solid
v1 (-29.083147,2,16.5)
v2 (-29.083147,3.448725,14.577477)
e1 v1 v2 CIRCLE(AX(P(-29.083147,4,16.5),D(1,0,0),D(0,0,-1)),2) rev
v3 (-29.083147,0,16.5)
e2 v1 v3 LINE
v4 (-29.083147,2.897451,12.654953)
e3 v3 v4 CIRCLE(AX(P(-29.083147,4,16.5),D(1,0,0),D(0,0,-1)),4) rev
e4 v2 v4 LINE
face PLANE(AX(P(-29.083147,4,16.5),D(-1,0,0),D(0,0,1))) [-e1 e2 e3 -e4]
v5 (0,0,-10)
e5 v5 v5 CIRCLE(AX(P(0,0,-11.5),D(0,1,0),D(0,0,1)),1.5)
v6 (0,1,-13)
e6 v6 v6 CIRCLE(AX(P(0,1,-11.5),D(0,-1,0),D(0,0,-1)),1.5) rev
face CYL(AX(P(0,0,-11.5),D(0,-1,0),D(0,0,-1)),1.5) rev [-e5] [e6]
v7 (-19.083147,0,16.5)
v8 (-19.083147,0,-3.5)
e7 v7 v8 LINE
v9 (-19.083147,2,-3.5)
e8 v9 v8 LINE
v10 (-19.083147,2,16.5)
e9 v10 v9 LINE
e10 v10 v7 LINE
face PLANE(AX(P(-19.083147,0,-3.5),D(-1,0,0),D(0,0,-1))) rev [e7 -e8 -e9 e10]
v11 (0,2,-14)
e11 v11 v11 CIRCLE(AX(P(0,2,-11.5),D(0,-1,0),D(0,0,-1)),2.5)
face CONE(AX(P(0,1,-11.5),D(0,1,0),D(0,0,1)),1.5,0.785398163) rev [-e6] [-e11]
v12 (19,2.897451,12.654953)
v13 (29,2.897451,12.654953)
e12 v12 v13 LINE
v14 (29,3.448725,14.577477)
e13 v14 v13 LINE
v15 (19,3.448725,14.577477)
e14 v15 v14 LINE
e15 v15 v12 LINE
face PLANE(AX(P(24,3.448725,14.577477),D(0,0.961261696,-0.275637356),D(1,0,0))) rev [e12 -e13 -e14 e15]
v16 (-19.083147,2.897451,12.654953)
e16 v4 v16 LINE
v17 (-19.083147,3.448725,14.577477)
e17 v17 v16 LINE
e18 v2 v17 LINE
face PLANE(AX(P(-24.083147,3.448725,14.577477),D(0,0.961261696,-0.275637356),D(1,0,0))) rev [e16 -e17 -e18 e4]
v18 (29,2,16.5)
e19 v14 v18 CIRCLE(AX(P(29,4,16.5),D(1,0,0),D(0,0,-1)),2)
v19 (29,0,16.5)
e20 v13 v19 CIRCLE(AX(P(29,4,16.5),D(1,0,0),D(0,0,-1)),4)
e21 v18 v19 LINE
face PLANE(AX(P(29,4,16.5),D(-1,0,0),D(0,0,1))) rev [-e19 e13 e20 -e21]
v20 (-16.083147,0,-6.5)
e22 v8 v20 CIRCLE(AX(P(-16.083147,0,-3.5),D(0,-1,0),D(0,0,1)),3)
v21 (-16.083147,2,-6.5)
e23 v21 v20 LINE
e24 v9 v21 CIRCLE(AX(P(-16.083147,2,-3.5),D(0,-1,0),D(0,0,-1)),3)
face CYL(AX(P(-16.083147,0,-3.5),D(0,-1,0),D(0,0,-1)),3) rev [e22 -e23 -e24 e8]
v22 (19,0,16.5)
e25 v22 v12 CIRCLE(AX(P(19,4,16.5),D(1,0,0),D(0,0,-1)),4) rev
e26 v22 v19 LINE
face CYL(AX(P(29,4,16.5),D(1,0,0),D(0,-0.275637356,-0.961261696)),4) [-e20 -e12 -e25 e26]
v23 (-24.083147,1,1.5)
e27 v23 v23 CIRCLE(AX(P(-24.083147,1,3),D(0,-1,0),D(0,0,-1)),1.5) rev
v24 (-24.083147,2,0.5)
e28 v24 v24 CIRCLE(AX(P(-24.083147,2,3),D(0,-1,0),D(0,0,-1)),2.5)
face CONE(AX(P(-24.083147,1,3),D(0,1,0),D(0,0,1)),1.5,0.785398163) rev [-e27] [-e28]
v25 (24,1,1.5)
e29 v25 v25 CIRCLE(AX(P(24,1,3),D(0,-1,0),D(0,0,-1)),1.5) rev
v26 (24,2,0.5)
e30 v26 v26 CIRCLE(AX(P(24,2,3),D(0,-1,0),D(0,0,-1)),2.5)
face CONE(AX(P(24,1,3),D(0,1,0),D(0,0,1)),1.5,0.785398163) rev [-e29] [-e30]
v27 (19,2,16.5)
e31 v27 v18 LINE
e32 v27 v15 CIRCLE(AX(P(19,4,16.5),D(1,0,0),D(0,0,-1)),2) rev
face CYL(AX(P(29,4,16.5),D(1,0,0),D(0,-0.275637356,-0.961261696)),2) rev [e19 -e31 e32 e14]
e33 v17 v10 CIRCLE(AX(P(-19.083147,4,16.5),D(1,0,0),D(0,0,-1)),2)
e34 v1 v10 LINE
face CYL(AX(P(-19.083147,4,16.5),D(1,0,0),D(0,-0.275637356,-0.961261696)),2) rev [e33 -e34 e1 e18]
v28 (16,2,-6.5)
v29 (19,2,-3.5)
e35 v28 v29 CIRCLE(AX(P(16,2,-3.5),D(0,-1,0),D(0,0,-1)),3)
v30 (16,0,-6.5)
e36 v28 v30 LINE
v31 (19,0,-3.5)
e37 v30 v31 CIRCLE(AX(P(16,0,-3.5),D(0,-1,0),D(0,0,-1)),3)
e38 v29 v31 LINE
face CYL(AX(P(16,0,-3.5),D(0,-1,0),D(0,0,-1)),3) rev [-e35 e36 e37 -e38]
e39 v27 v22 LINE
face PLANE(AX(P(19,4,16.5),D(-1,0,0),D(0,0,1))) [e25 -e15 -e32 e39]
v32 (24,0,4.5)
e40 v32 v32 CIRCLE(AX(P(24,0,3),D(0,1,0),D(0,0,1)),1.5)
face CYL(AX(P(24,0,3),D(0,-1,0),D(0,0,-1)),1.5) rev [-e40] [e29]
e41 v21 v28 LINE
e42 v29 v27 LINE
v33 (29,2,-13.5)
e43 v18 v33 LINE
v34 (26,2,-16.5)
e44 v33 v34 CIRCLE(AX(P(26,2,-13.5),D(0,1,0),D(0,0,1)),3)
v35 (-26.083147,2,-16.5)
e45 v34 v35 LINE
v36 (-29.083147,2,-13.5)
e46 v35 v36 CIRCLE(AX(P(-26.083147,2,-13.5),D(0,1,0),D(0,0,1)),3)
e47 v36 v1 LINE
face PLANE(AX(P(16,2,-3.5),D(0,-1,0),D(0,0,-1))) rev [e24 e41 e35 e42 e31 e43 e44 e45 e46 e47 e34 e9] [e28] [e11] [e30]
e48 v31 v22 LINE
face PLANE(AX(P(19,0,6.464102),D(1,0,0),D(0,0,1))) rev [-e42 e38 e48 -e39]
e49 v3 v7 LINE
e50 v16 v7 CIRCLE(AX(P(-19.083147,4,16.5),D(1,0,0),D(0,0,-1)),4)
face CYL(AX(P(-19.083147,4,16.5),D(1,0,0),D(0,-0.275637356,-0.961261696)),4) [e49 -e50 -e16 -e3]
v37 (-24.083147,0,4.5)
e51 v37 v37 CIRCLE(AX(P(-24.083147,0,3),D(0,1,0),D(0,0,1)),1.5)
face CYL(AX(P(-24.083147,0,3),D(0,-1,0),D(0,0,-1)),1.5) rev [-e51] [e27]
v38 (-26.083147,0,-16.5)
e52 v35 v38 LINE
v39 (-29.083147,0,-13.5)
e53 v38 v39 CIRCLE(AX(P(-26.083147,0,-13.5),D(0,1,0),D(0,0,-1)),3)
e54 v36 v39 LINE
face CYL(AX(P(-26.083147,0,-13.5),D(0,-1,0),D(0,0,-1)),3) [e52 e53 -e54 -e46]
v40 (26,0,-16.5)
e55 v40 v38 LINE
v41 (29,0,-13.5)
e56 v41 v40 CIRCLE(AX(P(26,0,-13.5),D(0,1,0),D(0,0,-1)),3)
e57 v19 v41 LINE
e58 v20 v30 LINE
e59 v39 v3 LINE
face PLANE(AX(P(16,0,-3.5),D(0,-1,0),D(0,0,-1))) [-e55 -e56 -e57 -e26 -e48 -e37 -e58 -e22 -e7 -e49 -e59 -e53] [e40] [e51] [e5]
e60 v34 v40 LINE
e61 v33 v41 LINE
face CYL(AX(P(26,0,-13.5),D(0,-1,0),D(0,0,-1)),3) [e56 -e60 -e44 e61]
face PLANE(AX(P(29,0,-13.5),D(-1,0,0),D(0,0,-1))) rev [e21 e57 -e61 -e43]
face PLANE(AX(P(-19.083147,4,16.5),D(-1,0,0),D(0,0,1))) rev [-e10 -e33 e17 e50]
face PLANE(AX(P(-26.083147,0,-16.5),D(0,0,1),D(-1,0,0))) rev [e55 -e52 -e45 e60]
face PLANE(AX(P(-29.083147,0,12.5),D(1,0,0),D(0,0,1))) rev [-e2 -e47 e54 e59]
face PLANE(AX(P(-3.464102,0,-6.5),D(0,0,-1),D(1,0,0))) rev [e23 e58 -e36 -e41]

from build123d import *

# Parameters (mm, degrees)
IZIM1_R                     = 1.5
Y_KSEKLIK_EKSTR_ZYON1_DEPTH = 2
Y_KSEKLIK_EKSTR_ZYON2_START = -10
Y_KSEKLIK_EKSTR_ZYON2_DEPTH = 10
Y_KSEKLIK_EKSTR_ZYON3_START = -10
Y_KSEKLIK_EKSTR_ZYON3_DEPTH = 10
KAT_Y_D_N_T_R2_START        = 12.5
KAT_Y_D_N_T_R2_OUTLINE_W    = 10
KAT_Y_D_N_T_R2_OUTLINE_H    = 6
KAT_Y_D_N_T_R2_DEPTH        = 8
KAT_Y_D_N_T_R2_START_2      = 16.5
KAT_Y_D_N_T_R2_2_OUTLINE_W  = 10
KAT_Y_D_N_T_R2_2_OUTLINE_H  = 4
KAT_Y_D_N_T_R2_2_DEPTH      = 4
KENAR_START                 = -29.083147129
KENAR_EKME1_DEPTH           = 10
KENAR_START_2               = 19
KENAR_EKME1_2_DEPTH         = 10
PAH3_SIZE                   = 1


# Read off the part's stored shape, not the designer's step: Katıyı-Dönüştür2, Kenar Çekme1
with BuildPart() as part:
    # Çizim1 → Yükseklik-Ekstrüzyon1 (new body)
    with BuildSketch(Plane(origin=(0, 0, 0), x_dir=(1, 0, 0), z_dir=(0, 1, 0))):
        with BuildLine():
            Line((29, -12.5), (19, -12.5))
            Line((19, -12.5), (19, -6.464101615))
            Line((19, -6.464101615), (19, 3.5))
            ThreePointArc((19, 3.5), (18.121320344, 5.621320344), (16, 6.5))
            Line((16, 6.5), (-3.464101615, 6.5))
            Line((-3.464101615, 6.5), (-16.083147129, 6.5))
            ThreePointArc((-16.083147129, 6.5), (-18.204467472, 5.621320344), (-19.083147129, 3.5))
            Line((-19.083147129, 3.5), (-19.083147129, -6.464101615))
            Line((-19.083147129, -6.464101615), (-19.083147129, -12.5))
            Line((-19.083147129, -12.5), (-29.083147129, -12.5))
            Line((-29.083147129, -12.5), (-29.083147129, 13.5))
            ThreePointArc((-29.083147129, 13.5), (-28.204467472, 15.621320344), (-26.083147129, 16.5))
            Line((-26.083147129, 16.5), (26, 16.5))
            ThreePointArc((26, 16.5), (28.121320344, 15.621320344), (29, 13.5))
            Line((29, 13.5), (29, -12.5))
        make_face()
        with Locations(Location((-24.083147129, -3, 0), (0, 0, 270))):
            Circle(IZIM1_R, mode=Mode.SUBTRACT)
        with Locations(Location((0, 11.5, 0), (0, 0, 270))):
            Circle(IZIM1_R, mode=Mode.SUBTRACT)
        with Locations(Location((24, -3, 0), (0, 0, 270))):
            Circle(IZIM1_R, mode=Mode.SUBTRACT)
    extrude(amount=Y_KSEKLIK_EKSTR_ZYON1_DEPTH)

    # Çizim2 → Yükseklik-Ekstrüzyon2 (add)
    with BuildSketch(Plane(origin=(29, 0, 0), x_dir=(0, 0, -1), z_dir=(1, 0, 0)).offset(Y_KSEKLIK_EKSTR_ZYON2_START)):
        with BuildLine():
            Line((-14.767949192, 3), (-12.627016654, 3))
            ThreePointArc((-12.627016654, 3), (-18.949489743, 7.16227766), (-16.5, 0))
            Line((-16.5, 0), (-12.5, 0))
            Line((-12.5, 0), (-12.5, 2))
            Line((-12.5, 2), (-16.5, 2))
            ThreePointArc((-16.5, 2), (-17.5, 5.732050808), (-14.767949192, 3))
        make_face()
    extrude(amount=Y_KSEKLIK_EKSTR_ZYON2_DEPTH)

    # Çizim3 → Yükseklik-Ekstrüzyon3 (add)
    with BuildSketch(Plane(origin=(-19.083147129, 0, 0), x_dir=(0, 0, -1), z_dir=(1, 0, 0)).offset(Y_KSEKLIK_EKSTR_ZYON3_START)):
        with BuildLine():
            Line((-12.5, 2), (-16.5, 2))
            ThreePointArc((-16.5, 2), (-17.5, 5.732050808), (-14.767949192, 3))
            Line((-14.767949192, 3), (-12.627016654, 3))
            ThreePointArc((-12.627016654, 3), (-18.949489743, 7.16227766), (-16.5, 0))
            Line((-16.5, 0), (-12.5, 0))
            Line((-12.5, 0), (-12.5, 2))
        make_face()
    extrude(amount=Y_KSEKLIK_EKSTR_ZYON3_DEPTH)

    # Katıyı-Dönüştür2 outline → Katıyı-Dönüştür2 (cut)
    with BuildSketch(Plane.XY.offset(KAT_Y_D_N_T_R2_START)):
        with Locations((24, 6)):
            Rectangle(KAT_Y_D_N_T_R2_OUTLINE_W, KAT_Y_D_N_T_R2_OUTLINE_H)
        with Locations((-24.083147129, 6)):
            Rectangle(KAT_Y_D_N_T_R2_OUTLINE_W, KAT_Y_D_N_T_R2_OUTLINE_H)
    extrude(amount=KAT_Y_D_N_T_R2_DEPTH, mode=Mode.SUBTRACT)

    # Kat_y_-D_n_t_r2 2 outline → Kat_y_-D_n_t_r2 2 (cut)
    with BuildSketch(Plane.XY.offset(KAT_Y_D_N_T_R2_START_2)):
        with Locations((24, 1)):
            Rectangle(KAT_Y_D_N_T_R2_2_OUTLINE_W, KAT_Y_D_N_T_R2_2_OUTLINE_H)
        with Locations((-24.083147129, 1)):
            Rectangle(KAT_Y_D_N_T_R2_2_OUTLINE_W, KAT_Y_D_N_T_R2_2_OUTLINE_H)
    extrude(amount=KAT_Y_D_N_T_R2_2_DEPTH, mode=Mode.SUBTRACT)

    # Kenar Çekme1 outline → Kenar Çekme1 (add)
    with BuildSketch(Plane.YZ.offset(KENAR_START)):
        with BuildLine():
            Line((3.448725288, 14.577476608), (2.897450577, 12.654953216))
            ThreePointArc((2.897450577, 12.654953216), (7.19454204, 18.907260093), (0, 16.5))
            Line((0, 16.5), (2, 16.5))
            ThreePointArc((2, 16.5), (5.59727102, 17.703630046), (3.448725288, 14.577476608))
        make_face()
    extrude(amount=KENAR_EKME1_DEPTH)

    # Kenar _ekme1 2 outline → Kenar _ekme1 2 (add)
    with BuildSketch(Plane.YZ.offset(KENAR_START_2)):
        with BuildLine():
            Line((3.448725288, 14.577476608), (2.897450577, 12.654953216))
            ThreePointArc((2.897450577, 12.654953216), (7.19454204, 18.907260093), (0, 16.5))
            Line((0, 16.5), (2, 16.5))
            ThreePointArc((2, 16.5), (5.59727102, 17.703630046), (3.448725288, 14.577476608))
        make_face()
    extrude(amount=KENAR_EKME1_2_DEPTH)

    # Pah3
    pah3_edges = [part.edges().sort_by_distance(p)[0] for p in [
        (24, 2, 1.5),
        (-24.083147129, 2, 1.5),
        (0, 2, -13),
    ]]
    chamfer(pah3_edges, length=PAH3_SIZE)


solid = part.part
